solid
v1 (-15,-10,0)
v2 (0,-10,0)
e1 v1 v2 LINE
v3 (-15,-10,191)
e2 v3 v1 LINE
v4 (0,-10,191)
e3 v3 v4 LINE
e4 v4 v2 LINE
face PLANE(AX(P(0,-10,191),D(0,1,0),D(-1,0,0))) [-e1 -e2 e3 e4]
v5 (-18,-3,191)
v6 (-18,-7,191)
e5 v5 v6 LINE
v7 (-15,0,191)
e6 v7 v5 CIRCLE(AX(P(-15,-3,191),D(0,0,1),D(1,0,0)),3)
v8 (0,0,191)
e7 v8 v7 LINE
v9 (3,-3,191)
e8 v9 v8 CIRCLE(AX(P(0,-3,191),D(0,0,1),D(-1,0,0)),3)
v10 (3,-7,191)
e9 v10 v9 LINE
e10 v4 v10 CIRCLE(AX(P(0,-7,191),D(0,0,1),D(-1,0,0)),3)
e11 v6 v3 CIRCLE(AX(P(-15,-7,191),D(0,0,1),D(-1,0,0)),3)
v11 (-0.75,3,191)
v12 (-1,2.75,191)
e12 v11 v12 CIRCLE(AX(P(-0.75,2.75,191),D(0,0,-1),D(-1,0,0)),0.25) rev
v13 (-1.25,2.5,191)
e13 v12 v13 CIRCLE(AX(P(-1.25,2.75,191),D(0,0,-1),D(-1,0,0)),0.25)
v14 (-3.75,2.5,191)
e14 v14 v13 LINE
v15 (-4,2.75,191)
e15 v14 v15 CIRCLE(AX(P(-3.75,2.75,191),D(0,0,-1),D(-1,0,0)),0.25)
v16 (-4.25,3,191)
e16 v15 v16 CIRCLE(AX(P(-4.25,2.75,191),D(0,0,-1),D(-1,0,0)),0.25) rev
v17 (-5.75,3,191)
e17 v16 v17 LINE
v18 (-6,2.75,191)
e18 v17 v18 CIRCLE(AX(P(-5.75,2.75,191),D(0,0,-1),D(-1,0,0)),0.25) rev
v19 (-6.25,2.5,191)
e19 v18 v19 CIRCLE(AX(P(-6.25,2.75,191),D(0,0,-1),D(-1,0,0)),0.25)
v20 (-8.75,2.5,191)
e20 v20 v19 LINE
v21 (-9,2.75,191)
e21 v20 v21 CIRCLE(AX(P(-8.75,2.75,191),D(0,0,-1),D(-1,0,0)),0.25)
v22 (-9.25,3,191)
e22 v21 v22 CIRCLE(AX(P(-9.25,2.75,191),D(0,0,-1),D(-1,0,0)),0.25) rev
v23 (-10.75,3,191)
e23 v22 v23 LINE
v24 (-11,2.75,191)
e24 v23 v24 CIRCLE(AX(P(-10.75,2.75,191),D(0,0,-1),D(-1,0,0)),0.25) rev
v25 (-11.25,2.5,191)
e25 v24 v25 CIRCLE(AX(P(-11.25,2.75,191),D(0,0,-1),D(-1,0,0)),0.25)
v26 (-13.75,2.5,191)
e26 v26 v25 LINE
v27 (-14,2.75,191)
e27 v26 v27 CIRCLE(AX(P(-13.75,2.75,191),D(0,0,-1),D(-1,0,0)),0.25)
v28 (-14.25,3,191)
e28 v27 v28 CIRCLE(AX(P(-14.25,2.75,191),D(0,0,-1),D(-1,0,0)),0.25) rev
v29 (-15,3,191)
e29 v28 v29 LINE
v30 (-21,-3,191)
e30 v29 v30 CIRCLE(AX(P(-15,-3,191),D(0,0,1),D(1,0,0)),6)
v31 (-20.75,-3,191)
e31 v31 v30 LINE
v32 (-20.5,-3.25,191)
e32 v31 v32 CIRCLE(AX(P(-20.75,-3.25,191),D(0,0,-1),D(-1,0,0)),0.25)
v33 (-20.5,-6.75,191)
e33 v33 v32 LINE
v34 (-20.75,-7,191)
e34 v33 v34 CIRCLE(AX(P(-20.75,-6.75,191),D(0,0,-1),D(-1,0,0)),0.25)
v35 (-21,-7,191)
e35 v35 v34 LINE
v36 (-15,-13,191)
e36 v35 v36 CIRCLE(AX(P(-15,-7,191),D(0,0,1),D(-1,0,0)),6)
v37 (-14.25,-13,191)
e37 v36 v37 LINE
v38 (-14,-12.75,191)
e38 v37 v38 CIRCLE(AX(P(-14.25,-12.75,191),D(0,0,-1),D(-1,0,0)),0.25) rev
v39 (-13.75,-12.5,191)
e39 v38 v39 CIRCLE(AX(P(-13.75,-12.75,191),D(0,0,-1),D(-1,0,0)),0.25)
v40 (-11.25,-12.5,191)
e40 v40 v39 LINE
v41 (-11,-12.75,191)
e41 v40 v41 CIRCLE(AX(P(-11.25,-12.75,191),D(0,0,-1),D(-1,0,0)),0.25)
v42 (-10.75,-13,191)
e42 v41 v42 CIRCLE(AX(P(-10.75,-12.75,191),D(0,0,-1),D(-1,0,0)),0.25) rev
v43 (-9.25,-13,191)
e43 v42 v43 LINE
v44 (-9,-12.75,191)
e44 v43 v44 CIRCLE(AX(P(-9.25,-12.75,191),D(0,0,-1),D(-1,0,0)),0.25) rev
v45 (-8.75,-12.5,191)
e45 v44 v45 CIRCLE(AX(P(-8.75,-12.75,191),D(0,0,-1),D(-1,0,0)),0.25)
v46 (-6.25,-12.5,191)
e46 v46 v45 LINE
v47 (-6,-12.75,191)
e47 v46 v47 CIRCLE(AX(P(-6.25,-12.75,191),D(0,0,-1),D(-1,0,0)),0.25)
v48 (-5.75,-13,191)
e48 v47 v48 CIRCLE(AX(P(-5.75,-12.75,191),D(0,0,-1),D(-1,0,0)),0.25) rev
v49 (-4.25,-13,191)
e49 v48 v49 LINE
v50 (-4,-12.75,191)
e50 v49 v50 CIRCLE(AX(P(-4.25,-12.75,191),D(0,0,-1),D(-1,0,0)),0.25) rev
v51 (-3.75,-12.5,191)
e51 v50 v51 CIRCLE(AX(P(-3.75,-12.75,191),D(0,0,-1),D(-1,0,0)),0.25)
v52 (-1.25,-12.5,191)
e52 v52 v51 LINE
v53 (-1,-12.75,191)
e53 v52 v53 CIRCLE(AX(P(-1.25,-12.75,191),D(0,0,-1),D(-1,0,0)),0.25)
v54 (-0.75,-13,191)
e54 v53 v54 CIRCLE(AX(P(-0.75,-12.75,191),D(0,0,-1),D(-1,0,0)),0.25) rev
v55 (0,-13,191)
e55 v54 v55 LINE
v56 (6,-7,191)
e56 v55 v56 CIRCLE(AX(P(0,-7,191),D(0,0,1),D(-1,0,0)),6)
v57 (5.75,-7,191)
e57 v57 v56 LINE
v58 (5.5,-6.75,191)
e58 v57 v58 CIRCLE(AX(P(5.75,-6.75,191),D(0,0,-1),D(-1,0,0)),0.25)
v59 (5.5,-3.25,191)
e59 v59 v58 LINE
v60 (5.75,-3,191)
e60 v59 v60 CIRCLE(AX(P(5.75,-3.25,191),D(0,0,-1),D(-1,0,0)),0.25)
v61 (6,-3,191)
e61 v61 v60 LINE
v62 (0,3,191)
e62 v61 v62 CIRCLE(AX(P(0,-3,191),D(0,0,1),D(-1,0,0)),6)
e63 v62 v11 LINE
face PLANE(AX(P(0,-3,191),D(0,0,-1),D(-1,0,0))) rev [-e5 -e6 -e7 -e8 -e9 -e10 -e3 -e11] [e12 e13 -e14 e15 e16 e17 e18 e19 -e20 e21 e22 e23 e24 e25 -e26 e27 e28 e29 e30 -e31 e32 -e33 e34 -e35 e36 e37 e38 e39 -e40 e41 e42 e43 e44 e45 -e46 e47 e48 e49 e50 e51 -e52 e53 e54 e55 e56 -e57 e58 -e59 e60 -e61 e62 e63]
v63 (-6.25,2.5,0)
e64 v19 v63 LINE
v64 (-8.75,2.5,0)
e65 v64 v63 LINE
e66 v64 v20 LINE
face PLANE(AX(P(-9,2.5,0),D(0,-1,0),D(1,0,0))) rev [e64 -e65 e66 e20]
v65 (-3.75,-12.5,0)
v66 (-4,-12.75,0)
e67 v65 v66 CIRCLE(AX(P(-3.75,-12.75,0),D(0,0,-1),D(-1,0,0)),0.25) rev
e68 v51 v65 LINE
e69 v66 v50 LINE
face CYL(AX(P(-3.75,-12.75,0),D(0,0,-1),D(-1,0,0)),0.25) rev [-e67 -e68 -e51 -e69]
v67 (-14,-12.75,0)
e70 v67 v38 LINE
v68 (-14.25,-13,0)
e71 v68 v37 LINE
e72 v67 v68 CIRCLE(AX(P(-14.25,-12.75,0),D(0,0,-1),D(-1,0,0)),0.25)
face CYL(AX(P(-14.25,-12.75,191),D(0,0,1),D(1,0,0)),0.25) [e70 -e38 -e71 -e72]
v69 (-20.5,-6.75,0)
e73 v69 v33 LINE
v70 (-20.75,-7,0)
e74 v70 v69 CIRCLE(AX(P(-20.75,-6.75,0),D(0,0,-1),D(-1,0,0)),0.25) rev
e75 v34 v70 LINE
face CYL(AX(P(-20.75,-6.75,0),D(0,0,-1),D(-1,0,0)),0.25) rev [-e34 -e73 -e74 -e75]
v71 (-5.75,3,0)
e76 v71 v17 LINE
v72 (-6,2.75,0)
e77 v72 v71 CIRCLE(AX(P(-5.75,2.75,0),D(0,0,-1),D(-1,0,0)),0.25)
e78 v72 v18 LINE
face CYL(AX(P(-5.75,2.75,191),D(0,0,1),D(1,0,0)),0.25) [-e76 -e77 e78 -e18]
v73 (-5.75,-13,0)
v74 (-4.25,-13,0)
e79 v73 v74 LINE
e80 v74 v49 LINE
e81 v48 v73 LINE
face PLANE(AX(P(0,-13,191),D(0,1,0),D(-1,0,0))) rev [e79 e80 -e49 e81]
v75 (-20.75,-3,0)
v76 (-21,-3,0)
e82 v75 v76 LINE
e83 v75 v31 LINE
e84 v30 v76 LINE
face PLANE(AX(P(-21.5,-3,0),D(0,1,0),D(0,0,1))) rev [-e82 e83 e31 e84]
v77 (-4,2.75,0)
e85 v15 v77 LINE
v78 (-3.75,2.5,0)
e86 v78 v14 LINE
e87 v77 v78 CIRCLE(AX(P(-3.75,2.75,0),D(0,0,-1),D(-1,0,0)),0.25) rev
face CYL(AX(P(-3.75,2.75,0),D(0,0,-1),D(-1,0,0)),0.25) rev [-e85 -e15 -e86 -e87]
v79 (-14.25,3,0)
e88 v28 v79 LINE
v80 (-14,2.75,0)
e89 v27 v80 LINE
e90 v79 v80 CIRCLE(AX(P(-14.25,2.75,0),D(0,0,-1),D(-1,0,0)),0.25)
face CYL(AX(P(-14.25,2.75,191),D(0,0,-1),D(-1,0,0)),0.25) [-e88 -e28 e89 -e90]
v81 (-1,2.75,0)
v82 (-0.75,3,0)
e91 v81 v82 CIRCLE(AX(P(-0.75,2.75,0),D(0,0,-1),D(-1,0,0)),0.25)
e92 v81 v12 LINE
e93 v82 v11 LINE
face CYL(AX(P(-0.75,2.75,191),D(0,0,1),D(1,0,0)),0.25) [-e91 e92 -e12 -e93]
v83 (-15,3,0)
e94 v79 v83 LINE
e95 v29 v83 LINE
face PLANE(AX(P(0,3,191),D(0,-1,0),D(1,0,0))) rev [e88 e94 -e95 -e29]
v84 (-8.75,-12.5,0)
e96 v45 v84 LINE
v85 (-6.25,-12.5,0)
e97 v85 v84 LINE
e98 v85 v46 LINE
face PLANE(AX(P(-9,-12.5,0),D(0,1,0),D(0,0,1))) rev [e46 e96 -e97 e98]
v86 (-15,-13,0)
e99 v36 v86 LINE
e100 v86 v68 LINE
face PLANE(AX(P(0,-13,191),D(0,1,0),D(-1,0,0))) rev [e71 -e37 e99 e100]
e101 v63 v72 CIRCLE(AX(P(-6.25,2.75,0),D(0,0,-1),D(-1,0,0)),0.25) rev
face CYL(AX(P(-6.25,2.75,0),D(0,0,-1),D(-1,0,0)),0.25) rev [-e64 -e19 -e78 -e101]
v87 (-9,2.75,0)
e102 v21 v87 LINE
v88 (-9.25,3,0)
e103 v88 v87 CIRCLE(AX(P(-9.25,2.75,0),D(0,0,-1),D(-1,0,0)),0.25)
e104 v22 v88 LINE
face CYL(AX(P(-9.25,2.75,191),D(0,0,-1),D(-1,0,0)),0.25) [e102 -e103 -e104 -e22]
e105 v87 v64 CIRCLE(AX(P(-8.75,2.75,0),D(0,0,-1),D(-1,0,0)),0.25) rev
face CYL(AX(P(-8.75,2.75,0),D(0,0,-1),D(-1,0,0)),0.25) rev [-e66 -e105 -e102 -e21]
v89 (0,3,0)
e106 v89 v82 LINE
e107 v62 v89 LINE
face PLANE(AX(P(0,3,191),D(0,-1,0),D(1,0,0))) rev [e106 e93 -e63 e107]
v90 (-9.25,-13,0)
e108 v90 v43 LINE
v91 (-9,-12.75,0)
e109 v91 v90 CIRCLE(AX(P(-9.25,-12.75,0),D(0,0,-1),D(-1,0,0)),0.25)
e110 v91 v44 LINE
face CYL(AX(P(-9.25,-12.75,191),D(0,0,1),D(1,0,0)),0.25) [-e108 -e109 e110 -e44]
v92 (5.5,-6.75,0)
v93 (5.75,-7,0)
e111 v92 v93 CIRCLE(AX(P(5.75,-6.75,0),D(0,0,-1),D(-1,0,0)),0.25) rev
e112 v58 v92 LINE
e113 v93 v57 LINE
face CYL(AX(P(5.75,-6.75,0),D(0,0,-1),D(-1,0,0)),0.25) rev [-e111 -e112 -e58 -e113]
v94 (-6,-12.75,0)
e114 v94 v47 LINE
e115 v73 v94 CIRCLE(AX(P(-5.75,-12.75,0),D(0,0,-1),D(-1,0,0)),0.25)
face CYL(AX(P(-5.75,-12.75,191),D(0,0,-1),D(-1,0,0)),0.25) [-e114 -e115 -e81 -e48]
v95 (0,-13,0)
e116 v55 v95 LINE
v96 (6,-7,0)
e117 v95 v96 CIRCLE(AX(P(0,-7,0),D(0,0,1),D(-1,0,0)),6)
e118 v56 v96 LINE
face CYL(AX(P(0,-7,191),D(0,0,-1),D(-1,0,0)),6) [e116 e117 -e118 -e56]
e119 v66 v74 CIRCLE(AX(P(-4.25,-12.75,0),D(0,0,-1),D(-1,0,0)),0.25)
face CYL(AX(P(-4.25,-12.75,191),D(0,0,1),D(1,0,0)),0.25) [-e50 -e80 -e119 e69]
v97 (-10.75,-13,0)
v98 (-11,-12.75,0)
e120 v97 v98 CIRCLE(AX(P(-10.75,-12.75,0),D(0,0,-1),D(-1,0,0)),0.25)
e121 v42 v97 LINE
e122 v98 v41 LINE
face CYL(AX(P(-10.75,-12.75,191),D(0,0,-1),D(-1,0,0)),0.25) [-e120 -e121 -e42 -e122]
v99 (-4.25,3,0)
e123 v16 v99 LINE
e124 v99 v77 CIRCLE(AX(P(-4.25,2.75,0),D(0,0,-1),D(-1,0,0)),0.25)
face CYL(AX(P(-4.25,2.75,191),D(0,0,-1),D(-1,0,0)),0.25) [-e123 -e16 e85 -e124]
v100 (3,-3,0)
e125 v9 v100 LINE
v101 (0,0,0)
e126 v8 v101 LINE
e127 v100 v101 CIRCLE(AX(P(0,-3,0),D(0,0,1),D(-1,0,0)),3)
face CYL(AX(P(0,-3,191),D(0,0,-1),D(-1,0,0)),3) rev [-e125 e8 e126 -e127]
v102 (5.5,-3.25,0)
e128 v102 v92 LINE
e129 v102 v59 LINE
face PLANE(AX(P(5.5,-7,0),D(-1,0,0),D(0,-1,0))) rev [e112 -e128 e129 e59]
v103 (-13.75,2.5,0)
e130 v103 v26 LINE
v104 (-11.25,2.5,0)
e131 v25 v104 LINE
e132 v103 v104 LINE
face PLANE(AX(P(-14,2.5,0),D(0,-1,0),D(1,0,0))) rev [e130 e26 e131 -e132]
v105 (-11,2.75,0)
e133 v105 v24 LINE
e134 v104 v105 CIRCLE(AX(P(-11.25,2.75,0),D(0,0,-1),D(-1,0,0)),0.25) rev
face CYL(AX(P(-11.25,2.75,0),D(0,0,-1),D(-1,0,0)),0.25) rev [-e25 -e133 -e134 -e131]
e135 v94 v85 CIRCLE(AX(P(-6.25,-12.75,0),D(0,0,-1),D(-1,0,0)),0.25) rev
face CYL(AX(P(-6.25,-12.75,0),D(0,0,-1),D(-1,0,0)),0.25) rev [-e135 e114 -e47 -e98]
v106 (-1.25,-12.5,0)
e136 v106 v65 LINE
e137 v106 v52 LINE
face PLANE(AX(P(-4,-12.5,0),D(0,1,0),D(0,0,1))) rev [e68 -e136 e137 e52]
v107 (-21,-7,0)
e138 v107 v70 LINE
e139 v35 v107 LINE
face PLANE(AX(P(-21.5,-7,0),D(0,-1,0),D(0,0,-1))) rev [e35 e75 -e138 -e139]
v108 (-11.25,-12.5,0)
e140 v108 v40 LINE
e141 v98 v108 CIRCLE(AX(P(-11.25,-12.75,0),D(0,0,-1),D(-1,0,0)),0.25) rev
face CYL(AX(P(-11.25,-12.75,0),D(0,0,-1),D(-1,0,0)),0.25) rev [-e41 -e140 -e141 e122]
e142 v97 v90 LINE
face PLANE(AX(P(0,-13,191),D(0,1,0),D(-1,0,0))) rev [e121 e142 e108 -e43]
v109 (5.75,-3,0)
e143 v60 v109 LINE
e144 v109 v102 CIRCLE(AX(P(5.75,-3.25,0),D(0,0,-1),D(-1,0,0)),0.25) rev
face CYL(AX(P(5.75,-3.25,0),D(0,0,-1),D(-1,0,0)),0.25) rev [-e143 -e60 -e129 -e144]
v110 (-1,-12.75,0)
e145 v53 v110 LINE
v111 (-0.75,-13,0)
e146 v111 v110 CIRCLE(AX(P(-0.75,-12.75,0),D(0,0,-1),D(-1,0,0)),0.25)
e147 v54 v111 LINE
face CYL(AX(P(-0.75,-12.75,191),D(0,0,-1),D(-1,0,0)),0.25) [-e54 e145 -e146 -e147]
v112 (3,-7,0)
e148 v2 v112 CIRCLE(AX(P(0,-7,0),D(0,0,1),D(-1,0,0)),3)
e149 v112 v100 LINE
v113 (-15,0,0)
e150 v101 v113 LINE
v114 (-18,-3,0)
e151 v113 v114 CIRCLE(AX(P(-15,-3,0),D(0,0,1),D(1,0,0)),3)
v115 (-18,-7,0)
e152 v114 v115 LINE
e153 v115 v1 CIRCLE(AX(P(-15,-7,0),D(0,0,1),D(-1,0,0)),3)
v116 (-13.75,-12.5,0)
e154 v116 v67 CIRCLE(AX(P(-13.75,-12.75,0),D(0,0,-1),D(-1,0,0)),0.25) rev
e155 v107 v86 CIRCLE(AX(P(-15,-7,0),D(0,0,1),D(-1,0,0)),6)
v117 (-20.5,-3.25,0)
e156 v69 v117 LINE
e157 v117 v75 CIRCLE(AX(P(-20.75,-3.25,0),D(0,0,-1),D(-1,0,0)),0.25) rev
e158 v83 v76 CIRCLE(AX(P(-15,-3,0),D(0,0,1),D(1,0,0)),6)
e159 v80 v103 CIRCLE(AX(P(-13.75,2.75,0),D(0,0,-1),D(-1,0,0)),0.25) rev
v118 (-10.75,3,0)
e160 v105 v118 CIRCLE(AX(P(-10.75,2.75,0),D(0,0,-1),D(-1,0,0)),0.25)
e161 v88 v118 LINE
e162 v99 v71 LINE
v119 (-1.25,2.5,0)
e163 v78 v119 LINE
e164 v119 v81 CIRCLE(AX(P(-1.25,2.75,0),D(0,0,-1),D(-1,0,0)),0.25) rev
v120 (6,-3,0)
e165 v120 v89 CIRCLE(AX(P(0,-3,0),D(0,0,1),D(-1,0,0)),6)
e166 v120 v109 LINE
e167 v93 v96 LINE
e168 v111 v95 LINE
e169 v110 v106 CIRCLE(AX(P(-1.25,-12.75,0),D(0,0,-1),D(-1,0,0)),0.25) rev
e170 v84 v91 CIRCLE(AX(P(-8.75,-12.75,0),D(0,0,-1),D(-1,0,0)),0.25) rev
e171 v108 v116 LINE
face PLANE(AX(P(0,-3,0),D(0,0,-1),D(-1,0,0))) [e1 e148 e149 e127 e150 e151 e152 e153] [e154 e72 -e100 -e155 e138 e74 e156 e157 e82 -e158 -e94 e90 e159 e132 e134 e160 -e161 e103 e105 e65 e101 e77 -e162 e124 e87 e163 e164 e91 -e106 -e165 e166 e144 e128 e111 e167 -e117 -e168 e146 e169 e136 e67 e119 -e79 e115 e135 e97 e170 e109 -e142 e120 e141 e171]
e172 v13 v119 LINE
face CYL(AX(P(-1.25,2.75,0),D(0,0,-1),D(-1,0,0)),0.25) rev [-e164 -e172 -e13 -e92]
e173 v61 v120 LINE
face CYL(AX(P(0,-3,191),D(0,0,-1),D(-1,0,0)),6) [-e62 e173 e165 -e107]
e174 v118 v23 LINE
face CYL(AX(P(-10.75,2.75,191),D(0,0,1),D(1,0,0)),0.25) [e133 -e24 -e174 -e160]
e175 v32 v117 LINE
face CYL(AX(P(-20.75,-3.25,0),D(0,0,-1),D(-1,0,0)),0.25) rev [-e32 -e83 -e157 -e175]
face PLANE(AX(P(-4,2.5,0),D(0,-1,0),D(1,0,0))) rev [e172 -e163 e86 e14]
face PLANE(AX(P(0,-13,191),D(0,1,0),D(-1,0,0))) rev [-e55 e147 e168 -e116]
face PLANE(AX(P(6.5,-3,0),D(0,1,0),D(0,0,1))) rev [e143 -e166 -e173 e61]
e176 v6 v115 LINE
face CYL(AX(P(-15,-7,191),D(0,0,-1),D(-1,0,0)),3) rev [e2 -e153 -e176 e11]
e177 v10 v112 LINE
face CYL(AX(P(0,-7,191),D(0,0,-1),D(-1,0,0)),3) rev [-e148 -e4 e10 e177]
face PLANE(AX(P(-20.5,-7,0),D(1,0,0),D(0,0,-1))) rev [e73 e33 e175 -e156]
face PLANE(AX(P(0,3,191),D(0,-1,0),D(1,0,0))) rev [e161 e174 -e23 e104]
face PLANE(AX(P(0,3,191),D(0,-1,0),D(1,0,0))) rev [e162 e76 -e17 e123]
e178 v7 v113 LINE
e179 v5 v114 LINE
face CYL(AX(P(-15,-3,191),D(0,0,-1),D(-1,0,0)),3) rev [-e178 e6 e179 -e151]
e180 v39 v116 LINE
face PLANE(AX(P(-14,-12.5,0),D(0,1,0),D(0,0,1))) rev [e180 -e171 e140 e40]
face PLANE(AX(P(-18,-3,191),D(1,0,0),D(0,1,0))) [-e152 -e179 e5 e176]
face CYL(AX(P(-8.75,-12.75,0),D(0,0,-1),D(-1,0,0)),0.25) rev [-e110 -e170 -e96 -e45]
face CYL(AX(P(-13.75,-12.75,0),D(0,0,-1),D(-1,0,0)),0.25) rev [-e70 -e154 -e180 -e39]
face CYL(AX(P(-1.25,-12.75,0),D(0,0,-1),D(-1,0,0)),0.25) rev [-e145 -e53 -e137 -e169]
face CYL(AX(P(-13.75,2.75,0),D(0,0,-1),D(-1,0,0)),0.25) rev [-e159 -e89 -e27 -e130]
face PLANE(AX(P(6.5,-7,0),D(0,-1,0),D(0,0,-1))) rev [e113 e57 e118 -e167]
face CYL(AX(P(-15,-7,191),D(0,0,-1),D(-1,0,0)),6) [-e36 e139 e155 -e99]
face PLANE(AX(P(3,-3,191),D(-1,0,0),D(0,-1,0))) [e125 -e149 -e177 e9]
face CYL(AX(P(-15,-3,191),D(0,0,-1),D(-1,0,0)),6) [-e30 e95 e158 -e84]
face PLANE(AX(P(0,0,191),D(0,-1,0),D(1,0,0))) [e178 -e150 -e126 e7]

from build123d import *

# Parameters (mm, degrees)
BOSS_EXTRUDE1_DEPTH = 191
SKETCH2_W           = 3
SKETCH2_H           = 1
SKETCH2_W_2         = 1
SKETCH2_H_2         = 4
CUT_EXTRUDE1_DEPTH  = 193.59023859
FILLET1_R           = 0.25


with BuildPart() as part:
    # Sketch1 → Boss-Extrude1 (new body)
    with BuildSketch(Plane.XY):
        with BuildLine():
            Line((0, 3), (-15, 3))
            ThreePointArc((-15, 3), (-19.242640687, 1.242640687), (-21, -3))
            Line((-21, -3), (-21, -7))
            ThreePointArc((-21, -7), (-19.242640687, -11.242640687), (-15, -13))
            Line((-15, -13), (0, -13))
            ThreePointArc((0, -13), (4.242640687, -11.242640687), (6, -7))
            Line((6, -7), (6, -3))
            ThreePointArc((6, -3), (4.242640687, 1.242640687), (0, 3))
        make_face()
        with BuildLine():
            Line((0, 0), (-15, 0))
            ThreePointArc((-15, 0), (-17.121320344, -0.878679656), (-18, -3))
            Line((-18, -3), (-18, -7))
            ThreePointArc((-18, -7), (-17.121320344, -9.121320344), (-15, -10))
            Line((-15, -10), (0, -10))
            ThreePointArc((0, -10), (2.121320344, -9.121320344), (3, -7))
            Line((3, -7), (3, -3))
            ThreePointArc((3, -3), (2.121320344, -0.878679656), (0, 0))
        make_face(mode=Mode.SUBTRACT)
    extrude(amount=BOSS_EXTRUDE1_DEPTH)

    # Sketch2 → Cut-Extrude1 (cut, through all)
    with BuildSketch(Plane.XY.offset(191)):
        with Locations((-7.5, 3)):
            Rectangle(SKETCH2_W, SKETCH2_H)
        with Locations((-12.5, 3)):
            Rectangle(SKETCH2_W, SKETCH2_H)
        with Locations((-2.5, 3)):
            Rectangle(SKETCH2_W, SKETCH2_H)
        with Locations((-2.5, -13)):
            Rectangle(SKETCH2_W, SKETCH2_H)
        with Locations((-12.5, -13)):
            Rectangle(SKETCH2_W, SKETCH2_H)
        with Locations((-7.5, -13)):
            Rectangle(SKETCH2_W, SKETCH2_H)
        with Locations((6, -5)):
            Rectangle(SKETCH2_W_2, SKETCH2_H_2)
        with Locations((-21, -5)):
            Rectangle(SKETCH2_W_2, SKETCH2_H_2)
    extrude(amount=-CUT_EXTRUDE1_DEPTH, mode=Mode.SUBTRACT)

    # Fillet1
    fillet1_edges = [part.edges().sort_by_distance(p)[0] for p in [
        (-20.5, -7, 95.5),
        (-20.5, -3, 95.5),
        (-14, -13, 95.5),
        (-11, -12.5, 95.5),
        (-6, -12.5, 95.5),
        (-11, -13, 95.5),
        (-9, -13, 95.5),
        (-6, -13, 95.5),
        (-4, -13, 95.5),
        (-14, -12.5, 95.5),
        (-9, -12.5, 95.5),
        (-1, -13, 95.5),
        (-1, -12.5, 95.5),
        (5.5, -7, 95.5),
        (-4, -12.5, 95.5),
        (5.5, -3, 95.5),
        (-1, 3, 95.5),
        (-4, 3, 95.5),
        (-6, 3, 95.5),
        (-14, 3, 95.5),
        (-11, 3, 95.5),
        (-9, 3, 95.5),
        (-1, 2.5, 95.5),
        (-4, 2.5, 95.5),
        (-6, 2.5, 95.5),
        (-9, 2.5, 95.5),
        (-11, 2.5, 95.5),
        (-14, 2.5, 95.5),
    ]]
    fillet(fillet1_edges, radius=FILLET1_R - 0.0001)  # a hair under: the kernel refuses the full size


solid = part.part
